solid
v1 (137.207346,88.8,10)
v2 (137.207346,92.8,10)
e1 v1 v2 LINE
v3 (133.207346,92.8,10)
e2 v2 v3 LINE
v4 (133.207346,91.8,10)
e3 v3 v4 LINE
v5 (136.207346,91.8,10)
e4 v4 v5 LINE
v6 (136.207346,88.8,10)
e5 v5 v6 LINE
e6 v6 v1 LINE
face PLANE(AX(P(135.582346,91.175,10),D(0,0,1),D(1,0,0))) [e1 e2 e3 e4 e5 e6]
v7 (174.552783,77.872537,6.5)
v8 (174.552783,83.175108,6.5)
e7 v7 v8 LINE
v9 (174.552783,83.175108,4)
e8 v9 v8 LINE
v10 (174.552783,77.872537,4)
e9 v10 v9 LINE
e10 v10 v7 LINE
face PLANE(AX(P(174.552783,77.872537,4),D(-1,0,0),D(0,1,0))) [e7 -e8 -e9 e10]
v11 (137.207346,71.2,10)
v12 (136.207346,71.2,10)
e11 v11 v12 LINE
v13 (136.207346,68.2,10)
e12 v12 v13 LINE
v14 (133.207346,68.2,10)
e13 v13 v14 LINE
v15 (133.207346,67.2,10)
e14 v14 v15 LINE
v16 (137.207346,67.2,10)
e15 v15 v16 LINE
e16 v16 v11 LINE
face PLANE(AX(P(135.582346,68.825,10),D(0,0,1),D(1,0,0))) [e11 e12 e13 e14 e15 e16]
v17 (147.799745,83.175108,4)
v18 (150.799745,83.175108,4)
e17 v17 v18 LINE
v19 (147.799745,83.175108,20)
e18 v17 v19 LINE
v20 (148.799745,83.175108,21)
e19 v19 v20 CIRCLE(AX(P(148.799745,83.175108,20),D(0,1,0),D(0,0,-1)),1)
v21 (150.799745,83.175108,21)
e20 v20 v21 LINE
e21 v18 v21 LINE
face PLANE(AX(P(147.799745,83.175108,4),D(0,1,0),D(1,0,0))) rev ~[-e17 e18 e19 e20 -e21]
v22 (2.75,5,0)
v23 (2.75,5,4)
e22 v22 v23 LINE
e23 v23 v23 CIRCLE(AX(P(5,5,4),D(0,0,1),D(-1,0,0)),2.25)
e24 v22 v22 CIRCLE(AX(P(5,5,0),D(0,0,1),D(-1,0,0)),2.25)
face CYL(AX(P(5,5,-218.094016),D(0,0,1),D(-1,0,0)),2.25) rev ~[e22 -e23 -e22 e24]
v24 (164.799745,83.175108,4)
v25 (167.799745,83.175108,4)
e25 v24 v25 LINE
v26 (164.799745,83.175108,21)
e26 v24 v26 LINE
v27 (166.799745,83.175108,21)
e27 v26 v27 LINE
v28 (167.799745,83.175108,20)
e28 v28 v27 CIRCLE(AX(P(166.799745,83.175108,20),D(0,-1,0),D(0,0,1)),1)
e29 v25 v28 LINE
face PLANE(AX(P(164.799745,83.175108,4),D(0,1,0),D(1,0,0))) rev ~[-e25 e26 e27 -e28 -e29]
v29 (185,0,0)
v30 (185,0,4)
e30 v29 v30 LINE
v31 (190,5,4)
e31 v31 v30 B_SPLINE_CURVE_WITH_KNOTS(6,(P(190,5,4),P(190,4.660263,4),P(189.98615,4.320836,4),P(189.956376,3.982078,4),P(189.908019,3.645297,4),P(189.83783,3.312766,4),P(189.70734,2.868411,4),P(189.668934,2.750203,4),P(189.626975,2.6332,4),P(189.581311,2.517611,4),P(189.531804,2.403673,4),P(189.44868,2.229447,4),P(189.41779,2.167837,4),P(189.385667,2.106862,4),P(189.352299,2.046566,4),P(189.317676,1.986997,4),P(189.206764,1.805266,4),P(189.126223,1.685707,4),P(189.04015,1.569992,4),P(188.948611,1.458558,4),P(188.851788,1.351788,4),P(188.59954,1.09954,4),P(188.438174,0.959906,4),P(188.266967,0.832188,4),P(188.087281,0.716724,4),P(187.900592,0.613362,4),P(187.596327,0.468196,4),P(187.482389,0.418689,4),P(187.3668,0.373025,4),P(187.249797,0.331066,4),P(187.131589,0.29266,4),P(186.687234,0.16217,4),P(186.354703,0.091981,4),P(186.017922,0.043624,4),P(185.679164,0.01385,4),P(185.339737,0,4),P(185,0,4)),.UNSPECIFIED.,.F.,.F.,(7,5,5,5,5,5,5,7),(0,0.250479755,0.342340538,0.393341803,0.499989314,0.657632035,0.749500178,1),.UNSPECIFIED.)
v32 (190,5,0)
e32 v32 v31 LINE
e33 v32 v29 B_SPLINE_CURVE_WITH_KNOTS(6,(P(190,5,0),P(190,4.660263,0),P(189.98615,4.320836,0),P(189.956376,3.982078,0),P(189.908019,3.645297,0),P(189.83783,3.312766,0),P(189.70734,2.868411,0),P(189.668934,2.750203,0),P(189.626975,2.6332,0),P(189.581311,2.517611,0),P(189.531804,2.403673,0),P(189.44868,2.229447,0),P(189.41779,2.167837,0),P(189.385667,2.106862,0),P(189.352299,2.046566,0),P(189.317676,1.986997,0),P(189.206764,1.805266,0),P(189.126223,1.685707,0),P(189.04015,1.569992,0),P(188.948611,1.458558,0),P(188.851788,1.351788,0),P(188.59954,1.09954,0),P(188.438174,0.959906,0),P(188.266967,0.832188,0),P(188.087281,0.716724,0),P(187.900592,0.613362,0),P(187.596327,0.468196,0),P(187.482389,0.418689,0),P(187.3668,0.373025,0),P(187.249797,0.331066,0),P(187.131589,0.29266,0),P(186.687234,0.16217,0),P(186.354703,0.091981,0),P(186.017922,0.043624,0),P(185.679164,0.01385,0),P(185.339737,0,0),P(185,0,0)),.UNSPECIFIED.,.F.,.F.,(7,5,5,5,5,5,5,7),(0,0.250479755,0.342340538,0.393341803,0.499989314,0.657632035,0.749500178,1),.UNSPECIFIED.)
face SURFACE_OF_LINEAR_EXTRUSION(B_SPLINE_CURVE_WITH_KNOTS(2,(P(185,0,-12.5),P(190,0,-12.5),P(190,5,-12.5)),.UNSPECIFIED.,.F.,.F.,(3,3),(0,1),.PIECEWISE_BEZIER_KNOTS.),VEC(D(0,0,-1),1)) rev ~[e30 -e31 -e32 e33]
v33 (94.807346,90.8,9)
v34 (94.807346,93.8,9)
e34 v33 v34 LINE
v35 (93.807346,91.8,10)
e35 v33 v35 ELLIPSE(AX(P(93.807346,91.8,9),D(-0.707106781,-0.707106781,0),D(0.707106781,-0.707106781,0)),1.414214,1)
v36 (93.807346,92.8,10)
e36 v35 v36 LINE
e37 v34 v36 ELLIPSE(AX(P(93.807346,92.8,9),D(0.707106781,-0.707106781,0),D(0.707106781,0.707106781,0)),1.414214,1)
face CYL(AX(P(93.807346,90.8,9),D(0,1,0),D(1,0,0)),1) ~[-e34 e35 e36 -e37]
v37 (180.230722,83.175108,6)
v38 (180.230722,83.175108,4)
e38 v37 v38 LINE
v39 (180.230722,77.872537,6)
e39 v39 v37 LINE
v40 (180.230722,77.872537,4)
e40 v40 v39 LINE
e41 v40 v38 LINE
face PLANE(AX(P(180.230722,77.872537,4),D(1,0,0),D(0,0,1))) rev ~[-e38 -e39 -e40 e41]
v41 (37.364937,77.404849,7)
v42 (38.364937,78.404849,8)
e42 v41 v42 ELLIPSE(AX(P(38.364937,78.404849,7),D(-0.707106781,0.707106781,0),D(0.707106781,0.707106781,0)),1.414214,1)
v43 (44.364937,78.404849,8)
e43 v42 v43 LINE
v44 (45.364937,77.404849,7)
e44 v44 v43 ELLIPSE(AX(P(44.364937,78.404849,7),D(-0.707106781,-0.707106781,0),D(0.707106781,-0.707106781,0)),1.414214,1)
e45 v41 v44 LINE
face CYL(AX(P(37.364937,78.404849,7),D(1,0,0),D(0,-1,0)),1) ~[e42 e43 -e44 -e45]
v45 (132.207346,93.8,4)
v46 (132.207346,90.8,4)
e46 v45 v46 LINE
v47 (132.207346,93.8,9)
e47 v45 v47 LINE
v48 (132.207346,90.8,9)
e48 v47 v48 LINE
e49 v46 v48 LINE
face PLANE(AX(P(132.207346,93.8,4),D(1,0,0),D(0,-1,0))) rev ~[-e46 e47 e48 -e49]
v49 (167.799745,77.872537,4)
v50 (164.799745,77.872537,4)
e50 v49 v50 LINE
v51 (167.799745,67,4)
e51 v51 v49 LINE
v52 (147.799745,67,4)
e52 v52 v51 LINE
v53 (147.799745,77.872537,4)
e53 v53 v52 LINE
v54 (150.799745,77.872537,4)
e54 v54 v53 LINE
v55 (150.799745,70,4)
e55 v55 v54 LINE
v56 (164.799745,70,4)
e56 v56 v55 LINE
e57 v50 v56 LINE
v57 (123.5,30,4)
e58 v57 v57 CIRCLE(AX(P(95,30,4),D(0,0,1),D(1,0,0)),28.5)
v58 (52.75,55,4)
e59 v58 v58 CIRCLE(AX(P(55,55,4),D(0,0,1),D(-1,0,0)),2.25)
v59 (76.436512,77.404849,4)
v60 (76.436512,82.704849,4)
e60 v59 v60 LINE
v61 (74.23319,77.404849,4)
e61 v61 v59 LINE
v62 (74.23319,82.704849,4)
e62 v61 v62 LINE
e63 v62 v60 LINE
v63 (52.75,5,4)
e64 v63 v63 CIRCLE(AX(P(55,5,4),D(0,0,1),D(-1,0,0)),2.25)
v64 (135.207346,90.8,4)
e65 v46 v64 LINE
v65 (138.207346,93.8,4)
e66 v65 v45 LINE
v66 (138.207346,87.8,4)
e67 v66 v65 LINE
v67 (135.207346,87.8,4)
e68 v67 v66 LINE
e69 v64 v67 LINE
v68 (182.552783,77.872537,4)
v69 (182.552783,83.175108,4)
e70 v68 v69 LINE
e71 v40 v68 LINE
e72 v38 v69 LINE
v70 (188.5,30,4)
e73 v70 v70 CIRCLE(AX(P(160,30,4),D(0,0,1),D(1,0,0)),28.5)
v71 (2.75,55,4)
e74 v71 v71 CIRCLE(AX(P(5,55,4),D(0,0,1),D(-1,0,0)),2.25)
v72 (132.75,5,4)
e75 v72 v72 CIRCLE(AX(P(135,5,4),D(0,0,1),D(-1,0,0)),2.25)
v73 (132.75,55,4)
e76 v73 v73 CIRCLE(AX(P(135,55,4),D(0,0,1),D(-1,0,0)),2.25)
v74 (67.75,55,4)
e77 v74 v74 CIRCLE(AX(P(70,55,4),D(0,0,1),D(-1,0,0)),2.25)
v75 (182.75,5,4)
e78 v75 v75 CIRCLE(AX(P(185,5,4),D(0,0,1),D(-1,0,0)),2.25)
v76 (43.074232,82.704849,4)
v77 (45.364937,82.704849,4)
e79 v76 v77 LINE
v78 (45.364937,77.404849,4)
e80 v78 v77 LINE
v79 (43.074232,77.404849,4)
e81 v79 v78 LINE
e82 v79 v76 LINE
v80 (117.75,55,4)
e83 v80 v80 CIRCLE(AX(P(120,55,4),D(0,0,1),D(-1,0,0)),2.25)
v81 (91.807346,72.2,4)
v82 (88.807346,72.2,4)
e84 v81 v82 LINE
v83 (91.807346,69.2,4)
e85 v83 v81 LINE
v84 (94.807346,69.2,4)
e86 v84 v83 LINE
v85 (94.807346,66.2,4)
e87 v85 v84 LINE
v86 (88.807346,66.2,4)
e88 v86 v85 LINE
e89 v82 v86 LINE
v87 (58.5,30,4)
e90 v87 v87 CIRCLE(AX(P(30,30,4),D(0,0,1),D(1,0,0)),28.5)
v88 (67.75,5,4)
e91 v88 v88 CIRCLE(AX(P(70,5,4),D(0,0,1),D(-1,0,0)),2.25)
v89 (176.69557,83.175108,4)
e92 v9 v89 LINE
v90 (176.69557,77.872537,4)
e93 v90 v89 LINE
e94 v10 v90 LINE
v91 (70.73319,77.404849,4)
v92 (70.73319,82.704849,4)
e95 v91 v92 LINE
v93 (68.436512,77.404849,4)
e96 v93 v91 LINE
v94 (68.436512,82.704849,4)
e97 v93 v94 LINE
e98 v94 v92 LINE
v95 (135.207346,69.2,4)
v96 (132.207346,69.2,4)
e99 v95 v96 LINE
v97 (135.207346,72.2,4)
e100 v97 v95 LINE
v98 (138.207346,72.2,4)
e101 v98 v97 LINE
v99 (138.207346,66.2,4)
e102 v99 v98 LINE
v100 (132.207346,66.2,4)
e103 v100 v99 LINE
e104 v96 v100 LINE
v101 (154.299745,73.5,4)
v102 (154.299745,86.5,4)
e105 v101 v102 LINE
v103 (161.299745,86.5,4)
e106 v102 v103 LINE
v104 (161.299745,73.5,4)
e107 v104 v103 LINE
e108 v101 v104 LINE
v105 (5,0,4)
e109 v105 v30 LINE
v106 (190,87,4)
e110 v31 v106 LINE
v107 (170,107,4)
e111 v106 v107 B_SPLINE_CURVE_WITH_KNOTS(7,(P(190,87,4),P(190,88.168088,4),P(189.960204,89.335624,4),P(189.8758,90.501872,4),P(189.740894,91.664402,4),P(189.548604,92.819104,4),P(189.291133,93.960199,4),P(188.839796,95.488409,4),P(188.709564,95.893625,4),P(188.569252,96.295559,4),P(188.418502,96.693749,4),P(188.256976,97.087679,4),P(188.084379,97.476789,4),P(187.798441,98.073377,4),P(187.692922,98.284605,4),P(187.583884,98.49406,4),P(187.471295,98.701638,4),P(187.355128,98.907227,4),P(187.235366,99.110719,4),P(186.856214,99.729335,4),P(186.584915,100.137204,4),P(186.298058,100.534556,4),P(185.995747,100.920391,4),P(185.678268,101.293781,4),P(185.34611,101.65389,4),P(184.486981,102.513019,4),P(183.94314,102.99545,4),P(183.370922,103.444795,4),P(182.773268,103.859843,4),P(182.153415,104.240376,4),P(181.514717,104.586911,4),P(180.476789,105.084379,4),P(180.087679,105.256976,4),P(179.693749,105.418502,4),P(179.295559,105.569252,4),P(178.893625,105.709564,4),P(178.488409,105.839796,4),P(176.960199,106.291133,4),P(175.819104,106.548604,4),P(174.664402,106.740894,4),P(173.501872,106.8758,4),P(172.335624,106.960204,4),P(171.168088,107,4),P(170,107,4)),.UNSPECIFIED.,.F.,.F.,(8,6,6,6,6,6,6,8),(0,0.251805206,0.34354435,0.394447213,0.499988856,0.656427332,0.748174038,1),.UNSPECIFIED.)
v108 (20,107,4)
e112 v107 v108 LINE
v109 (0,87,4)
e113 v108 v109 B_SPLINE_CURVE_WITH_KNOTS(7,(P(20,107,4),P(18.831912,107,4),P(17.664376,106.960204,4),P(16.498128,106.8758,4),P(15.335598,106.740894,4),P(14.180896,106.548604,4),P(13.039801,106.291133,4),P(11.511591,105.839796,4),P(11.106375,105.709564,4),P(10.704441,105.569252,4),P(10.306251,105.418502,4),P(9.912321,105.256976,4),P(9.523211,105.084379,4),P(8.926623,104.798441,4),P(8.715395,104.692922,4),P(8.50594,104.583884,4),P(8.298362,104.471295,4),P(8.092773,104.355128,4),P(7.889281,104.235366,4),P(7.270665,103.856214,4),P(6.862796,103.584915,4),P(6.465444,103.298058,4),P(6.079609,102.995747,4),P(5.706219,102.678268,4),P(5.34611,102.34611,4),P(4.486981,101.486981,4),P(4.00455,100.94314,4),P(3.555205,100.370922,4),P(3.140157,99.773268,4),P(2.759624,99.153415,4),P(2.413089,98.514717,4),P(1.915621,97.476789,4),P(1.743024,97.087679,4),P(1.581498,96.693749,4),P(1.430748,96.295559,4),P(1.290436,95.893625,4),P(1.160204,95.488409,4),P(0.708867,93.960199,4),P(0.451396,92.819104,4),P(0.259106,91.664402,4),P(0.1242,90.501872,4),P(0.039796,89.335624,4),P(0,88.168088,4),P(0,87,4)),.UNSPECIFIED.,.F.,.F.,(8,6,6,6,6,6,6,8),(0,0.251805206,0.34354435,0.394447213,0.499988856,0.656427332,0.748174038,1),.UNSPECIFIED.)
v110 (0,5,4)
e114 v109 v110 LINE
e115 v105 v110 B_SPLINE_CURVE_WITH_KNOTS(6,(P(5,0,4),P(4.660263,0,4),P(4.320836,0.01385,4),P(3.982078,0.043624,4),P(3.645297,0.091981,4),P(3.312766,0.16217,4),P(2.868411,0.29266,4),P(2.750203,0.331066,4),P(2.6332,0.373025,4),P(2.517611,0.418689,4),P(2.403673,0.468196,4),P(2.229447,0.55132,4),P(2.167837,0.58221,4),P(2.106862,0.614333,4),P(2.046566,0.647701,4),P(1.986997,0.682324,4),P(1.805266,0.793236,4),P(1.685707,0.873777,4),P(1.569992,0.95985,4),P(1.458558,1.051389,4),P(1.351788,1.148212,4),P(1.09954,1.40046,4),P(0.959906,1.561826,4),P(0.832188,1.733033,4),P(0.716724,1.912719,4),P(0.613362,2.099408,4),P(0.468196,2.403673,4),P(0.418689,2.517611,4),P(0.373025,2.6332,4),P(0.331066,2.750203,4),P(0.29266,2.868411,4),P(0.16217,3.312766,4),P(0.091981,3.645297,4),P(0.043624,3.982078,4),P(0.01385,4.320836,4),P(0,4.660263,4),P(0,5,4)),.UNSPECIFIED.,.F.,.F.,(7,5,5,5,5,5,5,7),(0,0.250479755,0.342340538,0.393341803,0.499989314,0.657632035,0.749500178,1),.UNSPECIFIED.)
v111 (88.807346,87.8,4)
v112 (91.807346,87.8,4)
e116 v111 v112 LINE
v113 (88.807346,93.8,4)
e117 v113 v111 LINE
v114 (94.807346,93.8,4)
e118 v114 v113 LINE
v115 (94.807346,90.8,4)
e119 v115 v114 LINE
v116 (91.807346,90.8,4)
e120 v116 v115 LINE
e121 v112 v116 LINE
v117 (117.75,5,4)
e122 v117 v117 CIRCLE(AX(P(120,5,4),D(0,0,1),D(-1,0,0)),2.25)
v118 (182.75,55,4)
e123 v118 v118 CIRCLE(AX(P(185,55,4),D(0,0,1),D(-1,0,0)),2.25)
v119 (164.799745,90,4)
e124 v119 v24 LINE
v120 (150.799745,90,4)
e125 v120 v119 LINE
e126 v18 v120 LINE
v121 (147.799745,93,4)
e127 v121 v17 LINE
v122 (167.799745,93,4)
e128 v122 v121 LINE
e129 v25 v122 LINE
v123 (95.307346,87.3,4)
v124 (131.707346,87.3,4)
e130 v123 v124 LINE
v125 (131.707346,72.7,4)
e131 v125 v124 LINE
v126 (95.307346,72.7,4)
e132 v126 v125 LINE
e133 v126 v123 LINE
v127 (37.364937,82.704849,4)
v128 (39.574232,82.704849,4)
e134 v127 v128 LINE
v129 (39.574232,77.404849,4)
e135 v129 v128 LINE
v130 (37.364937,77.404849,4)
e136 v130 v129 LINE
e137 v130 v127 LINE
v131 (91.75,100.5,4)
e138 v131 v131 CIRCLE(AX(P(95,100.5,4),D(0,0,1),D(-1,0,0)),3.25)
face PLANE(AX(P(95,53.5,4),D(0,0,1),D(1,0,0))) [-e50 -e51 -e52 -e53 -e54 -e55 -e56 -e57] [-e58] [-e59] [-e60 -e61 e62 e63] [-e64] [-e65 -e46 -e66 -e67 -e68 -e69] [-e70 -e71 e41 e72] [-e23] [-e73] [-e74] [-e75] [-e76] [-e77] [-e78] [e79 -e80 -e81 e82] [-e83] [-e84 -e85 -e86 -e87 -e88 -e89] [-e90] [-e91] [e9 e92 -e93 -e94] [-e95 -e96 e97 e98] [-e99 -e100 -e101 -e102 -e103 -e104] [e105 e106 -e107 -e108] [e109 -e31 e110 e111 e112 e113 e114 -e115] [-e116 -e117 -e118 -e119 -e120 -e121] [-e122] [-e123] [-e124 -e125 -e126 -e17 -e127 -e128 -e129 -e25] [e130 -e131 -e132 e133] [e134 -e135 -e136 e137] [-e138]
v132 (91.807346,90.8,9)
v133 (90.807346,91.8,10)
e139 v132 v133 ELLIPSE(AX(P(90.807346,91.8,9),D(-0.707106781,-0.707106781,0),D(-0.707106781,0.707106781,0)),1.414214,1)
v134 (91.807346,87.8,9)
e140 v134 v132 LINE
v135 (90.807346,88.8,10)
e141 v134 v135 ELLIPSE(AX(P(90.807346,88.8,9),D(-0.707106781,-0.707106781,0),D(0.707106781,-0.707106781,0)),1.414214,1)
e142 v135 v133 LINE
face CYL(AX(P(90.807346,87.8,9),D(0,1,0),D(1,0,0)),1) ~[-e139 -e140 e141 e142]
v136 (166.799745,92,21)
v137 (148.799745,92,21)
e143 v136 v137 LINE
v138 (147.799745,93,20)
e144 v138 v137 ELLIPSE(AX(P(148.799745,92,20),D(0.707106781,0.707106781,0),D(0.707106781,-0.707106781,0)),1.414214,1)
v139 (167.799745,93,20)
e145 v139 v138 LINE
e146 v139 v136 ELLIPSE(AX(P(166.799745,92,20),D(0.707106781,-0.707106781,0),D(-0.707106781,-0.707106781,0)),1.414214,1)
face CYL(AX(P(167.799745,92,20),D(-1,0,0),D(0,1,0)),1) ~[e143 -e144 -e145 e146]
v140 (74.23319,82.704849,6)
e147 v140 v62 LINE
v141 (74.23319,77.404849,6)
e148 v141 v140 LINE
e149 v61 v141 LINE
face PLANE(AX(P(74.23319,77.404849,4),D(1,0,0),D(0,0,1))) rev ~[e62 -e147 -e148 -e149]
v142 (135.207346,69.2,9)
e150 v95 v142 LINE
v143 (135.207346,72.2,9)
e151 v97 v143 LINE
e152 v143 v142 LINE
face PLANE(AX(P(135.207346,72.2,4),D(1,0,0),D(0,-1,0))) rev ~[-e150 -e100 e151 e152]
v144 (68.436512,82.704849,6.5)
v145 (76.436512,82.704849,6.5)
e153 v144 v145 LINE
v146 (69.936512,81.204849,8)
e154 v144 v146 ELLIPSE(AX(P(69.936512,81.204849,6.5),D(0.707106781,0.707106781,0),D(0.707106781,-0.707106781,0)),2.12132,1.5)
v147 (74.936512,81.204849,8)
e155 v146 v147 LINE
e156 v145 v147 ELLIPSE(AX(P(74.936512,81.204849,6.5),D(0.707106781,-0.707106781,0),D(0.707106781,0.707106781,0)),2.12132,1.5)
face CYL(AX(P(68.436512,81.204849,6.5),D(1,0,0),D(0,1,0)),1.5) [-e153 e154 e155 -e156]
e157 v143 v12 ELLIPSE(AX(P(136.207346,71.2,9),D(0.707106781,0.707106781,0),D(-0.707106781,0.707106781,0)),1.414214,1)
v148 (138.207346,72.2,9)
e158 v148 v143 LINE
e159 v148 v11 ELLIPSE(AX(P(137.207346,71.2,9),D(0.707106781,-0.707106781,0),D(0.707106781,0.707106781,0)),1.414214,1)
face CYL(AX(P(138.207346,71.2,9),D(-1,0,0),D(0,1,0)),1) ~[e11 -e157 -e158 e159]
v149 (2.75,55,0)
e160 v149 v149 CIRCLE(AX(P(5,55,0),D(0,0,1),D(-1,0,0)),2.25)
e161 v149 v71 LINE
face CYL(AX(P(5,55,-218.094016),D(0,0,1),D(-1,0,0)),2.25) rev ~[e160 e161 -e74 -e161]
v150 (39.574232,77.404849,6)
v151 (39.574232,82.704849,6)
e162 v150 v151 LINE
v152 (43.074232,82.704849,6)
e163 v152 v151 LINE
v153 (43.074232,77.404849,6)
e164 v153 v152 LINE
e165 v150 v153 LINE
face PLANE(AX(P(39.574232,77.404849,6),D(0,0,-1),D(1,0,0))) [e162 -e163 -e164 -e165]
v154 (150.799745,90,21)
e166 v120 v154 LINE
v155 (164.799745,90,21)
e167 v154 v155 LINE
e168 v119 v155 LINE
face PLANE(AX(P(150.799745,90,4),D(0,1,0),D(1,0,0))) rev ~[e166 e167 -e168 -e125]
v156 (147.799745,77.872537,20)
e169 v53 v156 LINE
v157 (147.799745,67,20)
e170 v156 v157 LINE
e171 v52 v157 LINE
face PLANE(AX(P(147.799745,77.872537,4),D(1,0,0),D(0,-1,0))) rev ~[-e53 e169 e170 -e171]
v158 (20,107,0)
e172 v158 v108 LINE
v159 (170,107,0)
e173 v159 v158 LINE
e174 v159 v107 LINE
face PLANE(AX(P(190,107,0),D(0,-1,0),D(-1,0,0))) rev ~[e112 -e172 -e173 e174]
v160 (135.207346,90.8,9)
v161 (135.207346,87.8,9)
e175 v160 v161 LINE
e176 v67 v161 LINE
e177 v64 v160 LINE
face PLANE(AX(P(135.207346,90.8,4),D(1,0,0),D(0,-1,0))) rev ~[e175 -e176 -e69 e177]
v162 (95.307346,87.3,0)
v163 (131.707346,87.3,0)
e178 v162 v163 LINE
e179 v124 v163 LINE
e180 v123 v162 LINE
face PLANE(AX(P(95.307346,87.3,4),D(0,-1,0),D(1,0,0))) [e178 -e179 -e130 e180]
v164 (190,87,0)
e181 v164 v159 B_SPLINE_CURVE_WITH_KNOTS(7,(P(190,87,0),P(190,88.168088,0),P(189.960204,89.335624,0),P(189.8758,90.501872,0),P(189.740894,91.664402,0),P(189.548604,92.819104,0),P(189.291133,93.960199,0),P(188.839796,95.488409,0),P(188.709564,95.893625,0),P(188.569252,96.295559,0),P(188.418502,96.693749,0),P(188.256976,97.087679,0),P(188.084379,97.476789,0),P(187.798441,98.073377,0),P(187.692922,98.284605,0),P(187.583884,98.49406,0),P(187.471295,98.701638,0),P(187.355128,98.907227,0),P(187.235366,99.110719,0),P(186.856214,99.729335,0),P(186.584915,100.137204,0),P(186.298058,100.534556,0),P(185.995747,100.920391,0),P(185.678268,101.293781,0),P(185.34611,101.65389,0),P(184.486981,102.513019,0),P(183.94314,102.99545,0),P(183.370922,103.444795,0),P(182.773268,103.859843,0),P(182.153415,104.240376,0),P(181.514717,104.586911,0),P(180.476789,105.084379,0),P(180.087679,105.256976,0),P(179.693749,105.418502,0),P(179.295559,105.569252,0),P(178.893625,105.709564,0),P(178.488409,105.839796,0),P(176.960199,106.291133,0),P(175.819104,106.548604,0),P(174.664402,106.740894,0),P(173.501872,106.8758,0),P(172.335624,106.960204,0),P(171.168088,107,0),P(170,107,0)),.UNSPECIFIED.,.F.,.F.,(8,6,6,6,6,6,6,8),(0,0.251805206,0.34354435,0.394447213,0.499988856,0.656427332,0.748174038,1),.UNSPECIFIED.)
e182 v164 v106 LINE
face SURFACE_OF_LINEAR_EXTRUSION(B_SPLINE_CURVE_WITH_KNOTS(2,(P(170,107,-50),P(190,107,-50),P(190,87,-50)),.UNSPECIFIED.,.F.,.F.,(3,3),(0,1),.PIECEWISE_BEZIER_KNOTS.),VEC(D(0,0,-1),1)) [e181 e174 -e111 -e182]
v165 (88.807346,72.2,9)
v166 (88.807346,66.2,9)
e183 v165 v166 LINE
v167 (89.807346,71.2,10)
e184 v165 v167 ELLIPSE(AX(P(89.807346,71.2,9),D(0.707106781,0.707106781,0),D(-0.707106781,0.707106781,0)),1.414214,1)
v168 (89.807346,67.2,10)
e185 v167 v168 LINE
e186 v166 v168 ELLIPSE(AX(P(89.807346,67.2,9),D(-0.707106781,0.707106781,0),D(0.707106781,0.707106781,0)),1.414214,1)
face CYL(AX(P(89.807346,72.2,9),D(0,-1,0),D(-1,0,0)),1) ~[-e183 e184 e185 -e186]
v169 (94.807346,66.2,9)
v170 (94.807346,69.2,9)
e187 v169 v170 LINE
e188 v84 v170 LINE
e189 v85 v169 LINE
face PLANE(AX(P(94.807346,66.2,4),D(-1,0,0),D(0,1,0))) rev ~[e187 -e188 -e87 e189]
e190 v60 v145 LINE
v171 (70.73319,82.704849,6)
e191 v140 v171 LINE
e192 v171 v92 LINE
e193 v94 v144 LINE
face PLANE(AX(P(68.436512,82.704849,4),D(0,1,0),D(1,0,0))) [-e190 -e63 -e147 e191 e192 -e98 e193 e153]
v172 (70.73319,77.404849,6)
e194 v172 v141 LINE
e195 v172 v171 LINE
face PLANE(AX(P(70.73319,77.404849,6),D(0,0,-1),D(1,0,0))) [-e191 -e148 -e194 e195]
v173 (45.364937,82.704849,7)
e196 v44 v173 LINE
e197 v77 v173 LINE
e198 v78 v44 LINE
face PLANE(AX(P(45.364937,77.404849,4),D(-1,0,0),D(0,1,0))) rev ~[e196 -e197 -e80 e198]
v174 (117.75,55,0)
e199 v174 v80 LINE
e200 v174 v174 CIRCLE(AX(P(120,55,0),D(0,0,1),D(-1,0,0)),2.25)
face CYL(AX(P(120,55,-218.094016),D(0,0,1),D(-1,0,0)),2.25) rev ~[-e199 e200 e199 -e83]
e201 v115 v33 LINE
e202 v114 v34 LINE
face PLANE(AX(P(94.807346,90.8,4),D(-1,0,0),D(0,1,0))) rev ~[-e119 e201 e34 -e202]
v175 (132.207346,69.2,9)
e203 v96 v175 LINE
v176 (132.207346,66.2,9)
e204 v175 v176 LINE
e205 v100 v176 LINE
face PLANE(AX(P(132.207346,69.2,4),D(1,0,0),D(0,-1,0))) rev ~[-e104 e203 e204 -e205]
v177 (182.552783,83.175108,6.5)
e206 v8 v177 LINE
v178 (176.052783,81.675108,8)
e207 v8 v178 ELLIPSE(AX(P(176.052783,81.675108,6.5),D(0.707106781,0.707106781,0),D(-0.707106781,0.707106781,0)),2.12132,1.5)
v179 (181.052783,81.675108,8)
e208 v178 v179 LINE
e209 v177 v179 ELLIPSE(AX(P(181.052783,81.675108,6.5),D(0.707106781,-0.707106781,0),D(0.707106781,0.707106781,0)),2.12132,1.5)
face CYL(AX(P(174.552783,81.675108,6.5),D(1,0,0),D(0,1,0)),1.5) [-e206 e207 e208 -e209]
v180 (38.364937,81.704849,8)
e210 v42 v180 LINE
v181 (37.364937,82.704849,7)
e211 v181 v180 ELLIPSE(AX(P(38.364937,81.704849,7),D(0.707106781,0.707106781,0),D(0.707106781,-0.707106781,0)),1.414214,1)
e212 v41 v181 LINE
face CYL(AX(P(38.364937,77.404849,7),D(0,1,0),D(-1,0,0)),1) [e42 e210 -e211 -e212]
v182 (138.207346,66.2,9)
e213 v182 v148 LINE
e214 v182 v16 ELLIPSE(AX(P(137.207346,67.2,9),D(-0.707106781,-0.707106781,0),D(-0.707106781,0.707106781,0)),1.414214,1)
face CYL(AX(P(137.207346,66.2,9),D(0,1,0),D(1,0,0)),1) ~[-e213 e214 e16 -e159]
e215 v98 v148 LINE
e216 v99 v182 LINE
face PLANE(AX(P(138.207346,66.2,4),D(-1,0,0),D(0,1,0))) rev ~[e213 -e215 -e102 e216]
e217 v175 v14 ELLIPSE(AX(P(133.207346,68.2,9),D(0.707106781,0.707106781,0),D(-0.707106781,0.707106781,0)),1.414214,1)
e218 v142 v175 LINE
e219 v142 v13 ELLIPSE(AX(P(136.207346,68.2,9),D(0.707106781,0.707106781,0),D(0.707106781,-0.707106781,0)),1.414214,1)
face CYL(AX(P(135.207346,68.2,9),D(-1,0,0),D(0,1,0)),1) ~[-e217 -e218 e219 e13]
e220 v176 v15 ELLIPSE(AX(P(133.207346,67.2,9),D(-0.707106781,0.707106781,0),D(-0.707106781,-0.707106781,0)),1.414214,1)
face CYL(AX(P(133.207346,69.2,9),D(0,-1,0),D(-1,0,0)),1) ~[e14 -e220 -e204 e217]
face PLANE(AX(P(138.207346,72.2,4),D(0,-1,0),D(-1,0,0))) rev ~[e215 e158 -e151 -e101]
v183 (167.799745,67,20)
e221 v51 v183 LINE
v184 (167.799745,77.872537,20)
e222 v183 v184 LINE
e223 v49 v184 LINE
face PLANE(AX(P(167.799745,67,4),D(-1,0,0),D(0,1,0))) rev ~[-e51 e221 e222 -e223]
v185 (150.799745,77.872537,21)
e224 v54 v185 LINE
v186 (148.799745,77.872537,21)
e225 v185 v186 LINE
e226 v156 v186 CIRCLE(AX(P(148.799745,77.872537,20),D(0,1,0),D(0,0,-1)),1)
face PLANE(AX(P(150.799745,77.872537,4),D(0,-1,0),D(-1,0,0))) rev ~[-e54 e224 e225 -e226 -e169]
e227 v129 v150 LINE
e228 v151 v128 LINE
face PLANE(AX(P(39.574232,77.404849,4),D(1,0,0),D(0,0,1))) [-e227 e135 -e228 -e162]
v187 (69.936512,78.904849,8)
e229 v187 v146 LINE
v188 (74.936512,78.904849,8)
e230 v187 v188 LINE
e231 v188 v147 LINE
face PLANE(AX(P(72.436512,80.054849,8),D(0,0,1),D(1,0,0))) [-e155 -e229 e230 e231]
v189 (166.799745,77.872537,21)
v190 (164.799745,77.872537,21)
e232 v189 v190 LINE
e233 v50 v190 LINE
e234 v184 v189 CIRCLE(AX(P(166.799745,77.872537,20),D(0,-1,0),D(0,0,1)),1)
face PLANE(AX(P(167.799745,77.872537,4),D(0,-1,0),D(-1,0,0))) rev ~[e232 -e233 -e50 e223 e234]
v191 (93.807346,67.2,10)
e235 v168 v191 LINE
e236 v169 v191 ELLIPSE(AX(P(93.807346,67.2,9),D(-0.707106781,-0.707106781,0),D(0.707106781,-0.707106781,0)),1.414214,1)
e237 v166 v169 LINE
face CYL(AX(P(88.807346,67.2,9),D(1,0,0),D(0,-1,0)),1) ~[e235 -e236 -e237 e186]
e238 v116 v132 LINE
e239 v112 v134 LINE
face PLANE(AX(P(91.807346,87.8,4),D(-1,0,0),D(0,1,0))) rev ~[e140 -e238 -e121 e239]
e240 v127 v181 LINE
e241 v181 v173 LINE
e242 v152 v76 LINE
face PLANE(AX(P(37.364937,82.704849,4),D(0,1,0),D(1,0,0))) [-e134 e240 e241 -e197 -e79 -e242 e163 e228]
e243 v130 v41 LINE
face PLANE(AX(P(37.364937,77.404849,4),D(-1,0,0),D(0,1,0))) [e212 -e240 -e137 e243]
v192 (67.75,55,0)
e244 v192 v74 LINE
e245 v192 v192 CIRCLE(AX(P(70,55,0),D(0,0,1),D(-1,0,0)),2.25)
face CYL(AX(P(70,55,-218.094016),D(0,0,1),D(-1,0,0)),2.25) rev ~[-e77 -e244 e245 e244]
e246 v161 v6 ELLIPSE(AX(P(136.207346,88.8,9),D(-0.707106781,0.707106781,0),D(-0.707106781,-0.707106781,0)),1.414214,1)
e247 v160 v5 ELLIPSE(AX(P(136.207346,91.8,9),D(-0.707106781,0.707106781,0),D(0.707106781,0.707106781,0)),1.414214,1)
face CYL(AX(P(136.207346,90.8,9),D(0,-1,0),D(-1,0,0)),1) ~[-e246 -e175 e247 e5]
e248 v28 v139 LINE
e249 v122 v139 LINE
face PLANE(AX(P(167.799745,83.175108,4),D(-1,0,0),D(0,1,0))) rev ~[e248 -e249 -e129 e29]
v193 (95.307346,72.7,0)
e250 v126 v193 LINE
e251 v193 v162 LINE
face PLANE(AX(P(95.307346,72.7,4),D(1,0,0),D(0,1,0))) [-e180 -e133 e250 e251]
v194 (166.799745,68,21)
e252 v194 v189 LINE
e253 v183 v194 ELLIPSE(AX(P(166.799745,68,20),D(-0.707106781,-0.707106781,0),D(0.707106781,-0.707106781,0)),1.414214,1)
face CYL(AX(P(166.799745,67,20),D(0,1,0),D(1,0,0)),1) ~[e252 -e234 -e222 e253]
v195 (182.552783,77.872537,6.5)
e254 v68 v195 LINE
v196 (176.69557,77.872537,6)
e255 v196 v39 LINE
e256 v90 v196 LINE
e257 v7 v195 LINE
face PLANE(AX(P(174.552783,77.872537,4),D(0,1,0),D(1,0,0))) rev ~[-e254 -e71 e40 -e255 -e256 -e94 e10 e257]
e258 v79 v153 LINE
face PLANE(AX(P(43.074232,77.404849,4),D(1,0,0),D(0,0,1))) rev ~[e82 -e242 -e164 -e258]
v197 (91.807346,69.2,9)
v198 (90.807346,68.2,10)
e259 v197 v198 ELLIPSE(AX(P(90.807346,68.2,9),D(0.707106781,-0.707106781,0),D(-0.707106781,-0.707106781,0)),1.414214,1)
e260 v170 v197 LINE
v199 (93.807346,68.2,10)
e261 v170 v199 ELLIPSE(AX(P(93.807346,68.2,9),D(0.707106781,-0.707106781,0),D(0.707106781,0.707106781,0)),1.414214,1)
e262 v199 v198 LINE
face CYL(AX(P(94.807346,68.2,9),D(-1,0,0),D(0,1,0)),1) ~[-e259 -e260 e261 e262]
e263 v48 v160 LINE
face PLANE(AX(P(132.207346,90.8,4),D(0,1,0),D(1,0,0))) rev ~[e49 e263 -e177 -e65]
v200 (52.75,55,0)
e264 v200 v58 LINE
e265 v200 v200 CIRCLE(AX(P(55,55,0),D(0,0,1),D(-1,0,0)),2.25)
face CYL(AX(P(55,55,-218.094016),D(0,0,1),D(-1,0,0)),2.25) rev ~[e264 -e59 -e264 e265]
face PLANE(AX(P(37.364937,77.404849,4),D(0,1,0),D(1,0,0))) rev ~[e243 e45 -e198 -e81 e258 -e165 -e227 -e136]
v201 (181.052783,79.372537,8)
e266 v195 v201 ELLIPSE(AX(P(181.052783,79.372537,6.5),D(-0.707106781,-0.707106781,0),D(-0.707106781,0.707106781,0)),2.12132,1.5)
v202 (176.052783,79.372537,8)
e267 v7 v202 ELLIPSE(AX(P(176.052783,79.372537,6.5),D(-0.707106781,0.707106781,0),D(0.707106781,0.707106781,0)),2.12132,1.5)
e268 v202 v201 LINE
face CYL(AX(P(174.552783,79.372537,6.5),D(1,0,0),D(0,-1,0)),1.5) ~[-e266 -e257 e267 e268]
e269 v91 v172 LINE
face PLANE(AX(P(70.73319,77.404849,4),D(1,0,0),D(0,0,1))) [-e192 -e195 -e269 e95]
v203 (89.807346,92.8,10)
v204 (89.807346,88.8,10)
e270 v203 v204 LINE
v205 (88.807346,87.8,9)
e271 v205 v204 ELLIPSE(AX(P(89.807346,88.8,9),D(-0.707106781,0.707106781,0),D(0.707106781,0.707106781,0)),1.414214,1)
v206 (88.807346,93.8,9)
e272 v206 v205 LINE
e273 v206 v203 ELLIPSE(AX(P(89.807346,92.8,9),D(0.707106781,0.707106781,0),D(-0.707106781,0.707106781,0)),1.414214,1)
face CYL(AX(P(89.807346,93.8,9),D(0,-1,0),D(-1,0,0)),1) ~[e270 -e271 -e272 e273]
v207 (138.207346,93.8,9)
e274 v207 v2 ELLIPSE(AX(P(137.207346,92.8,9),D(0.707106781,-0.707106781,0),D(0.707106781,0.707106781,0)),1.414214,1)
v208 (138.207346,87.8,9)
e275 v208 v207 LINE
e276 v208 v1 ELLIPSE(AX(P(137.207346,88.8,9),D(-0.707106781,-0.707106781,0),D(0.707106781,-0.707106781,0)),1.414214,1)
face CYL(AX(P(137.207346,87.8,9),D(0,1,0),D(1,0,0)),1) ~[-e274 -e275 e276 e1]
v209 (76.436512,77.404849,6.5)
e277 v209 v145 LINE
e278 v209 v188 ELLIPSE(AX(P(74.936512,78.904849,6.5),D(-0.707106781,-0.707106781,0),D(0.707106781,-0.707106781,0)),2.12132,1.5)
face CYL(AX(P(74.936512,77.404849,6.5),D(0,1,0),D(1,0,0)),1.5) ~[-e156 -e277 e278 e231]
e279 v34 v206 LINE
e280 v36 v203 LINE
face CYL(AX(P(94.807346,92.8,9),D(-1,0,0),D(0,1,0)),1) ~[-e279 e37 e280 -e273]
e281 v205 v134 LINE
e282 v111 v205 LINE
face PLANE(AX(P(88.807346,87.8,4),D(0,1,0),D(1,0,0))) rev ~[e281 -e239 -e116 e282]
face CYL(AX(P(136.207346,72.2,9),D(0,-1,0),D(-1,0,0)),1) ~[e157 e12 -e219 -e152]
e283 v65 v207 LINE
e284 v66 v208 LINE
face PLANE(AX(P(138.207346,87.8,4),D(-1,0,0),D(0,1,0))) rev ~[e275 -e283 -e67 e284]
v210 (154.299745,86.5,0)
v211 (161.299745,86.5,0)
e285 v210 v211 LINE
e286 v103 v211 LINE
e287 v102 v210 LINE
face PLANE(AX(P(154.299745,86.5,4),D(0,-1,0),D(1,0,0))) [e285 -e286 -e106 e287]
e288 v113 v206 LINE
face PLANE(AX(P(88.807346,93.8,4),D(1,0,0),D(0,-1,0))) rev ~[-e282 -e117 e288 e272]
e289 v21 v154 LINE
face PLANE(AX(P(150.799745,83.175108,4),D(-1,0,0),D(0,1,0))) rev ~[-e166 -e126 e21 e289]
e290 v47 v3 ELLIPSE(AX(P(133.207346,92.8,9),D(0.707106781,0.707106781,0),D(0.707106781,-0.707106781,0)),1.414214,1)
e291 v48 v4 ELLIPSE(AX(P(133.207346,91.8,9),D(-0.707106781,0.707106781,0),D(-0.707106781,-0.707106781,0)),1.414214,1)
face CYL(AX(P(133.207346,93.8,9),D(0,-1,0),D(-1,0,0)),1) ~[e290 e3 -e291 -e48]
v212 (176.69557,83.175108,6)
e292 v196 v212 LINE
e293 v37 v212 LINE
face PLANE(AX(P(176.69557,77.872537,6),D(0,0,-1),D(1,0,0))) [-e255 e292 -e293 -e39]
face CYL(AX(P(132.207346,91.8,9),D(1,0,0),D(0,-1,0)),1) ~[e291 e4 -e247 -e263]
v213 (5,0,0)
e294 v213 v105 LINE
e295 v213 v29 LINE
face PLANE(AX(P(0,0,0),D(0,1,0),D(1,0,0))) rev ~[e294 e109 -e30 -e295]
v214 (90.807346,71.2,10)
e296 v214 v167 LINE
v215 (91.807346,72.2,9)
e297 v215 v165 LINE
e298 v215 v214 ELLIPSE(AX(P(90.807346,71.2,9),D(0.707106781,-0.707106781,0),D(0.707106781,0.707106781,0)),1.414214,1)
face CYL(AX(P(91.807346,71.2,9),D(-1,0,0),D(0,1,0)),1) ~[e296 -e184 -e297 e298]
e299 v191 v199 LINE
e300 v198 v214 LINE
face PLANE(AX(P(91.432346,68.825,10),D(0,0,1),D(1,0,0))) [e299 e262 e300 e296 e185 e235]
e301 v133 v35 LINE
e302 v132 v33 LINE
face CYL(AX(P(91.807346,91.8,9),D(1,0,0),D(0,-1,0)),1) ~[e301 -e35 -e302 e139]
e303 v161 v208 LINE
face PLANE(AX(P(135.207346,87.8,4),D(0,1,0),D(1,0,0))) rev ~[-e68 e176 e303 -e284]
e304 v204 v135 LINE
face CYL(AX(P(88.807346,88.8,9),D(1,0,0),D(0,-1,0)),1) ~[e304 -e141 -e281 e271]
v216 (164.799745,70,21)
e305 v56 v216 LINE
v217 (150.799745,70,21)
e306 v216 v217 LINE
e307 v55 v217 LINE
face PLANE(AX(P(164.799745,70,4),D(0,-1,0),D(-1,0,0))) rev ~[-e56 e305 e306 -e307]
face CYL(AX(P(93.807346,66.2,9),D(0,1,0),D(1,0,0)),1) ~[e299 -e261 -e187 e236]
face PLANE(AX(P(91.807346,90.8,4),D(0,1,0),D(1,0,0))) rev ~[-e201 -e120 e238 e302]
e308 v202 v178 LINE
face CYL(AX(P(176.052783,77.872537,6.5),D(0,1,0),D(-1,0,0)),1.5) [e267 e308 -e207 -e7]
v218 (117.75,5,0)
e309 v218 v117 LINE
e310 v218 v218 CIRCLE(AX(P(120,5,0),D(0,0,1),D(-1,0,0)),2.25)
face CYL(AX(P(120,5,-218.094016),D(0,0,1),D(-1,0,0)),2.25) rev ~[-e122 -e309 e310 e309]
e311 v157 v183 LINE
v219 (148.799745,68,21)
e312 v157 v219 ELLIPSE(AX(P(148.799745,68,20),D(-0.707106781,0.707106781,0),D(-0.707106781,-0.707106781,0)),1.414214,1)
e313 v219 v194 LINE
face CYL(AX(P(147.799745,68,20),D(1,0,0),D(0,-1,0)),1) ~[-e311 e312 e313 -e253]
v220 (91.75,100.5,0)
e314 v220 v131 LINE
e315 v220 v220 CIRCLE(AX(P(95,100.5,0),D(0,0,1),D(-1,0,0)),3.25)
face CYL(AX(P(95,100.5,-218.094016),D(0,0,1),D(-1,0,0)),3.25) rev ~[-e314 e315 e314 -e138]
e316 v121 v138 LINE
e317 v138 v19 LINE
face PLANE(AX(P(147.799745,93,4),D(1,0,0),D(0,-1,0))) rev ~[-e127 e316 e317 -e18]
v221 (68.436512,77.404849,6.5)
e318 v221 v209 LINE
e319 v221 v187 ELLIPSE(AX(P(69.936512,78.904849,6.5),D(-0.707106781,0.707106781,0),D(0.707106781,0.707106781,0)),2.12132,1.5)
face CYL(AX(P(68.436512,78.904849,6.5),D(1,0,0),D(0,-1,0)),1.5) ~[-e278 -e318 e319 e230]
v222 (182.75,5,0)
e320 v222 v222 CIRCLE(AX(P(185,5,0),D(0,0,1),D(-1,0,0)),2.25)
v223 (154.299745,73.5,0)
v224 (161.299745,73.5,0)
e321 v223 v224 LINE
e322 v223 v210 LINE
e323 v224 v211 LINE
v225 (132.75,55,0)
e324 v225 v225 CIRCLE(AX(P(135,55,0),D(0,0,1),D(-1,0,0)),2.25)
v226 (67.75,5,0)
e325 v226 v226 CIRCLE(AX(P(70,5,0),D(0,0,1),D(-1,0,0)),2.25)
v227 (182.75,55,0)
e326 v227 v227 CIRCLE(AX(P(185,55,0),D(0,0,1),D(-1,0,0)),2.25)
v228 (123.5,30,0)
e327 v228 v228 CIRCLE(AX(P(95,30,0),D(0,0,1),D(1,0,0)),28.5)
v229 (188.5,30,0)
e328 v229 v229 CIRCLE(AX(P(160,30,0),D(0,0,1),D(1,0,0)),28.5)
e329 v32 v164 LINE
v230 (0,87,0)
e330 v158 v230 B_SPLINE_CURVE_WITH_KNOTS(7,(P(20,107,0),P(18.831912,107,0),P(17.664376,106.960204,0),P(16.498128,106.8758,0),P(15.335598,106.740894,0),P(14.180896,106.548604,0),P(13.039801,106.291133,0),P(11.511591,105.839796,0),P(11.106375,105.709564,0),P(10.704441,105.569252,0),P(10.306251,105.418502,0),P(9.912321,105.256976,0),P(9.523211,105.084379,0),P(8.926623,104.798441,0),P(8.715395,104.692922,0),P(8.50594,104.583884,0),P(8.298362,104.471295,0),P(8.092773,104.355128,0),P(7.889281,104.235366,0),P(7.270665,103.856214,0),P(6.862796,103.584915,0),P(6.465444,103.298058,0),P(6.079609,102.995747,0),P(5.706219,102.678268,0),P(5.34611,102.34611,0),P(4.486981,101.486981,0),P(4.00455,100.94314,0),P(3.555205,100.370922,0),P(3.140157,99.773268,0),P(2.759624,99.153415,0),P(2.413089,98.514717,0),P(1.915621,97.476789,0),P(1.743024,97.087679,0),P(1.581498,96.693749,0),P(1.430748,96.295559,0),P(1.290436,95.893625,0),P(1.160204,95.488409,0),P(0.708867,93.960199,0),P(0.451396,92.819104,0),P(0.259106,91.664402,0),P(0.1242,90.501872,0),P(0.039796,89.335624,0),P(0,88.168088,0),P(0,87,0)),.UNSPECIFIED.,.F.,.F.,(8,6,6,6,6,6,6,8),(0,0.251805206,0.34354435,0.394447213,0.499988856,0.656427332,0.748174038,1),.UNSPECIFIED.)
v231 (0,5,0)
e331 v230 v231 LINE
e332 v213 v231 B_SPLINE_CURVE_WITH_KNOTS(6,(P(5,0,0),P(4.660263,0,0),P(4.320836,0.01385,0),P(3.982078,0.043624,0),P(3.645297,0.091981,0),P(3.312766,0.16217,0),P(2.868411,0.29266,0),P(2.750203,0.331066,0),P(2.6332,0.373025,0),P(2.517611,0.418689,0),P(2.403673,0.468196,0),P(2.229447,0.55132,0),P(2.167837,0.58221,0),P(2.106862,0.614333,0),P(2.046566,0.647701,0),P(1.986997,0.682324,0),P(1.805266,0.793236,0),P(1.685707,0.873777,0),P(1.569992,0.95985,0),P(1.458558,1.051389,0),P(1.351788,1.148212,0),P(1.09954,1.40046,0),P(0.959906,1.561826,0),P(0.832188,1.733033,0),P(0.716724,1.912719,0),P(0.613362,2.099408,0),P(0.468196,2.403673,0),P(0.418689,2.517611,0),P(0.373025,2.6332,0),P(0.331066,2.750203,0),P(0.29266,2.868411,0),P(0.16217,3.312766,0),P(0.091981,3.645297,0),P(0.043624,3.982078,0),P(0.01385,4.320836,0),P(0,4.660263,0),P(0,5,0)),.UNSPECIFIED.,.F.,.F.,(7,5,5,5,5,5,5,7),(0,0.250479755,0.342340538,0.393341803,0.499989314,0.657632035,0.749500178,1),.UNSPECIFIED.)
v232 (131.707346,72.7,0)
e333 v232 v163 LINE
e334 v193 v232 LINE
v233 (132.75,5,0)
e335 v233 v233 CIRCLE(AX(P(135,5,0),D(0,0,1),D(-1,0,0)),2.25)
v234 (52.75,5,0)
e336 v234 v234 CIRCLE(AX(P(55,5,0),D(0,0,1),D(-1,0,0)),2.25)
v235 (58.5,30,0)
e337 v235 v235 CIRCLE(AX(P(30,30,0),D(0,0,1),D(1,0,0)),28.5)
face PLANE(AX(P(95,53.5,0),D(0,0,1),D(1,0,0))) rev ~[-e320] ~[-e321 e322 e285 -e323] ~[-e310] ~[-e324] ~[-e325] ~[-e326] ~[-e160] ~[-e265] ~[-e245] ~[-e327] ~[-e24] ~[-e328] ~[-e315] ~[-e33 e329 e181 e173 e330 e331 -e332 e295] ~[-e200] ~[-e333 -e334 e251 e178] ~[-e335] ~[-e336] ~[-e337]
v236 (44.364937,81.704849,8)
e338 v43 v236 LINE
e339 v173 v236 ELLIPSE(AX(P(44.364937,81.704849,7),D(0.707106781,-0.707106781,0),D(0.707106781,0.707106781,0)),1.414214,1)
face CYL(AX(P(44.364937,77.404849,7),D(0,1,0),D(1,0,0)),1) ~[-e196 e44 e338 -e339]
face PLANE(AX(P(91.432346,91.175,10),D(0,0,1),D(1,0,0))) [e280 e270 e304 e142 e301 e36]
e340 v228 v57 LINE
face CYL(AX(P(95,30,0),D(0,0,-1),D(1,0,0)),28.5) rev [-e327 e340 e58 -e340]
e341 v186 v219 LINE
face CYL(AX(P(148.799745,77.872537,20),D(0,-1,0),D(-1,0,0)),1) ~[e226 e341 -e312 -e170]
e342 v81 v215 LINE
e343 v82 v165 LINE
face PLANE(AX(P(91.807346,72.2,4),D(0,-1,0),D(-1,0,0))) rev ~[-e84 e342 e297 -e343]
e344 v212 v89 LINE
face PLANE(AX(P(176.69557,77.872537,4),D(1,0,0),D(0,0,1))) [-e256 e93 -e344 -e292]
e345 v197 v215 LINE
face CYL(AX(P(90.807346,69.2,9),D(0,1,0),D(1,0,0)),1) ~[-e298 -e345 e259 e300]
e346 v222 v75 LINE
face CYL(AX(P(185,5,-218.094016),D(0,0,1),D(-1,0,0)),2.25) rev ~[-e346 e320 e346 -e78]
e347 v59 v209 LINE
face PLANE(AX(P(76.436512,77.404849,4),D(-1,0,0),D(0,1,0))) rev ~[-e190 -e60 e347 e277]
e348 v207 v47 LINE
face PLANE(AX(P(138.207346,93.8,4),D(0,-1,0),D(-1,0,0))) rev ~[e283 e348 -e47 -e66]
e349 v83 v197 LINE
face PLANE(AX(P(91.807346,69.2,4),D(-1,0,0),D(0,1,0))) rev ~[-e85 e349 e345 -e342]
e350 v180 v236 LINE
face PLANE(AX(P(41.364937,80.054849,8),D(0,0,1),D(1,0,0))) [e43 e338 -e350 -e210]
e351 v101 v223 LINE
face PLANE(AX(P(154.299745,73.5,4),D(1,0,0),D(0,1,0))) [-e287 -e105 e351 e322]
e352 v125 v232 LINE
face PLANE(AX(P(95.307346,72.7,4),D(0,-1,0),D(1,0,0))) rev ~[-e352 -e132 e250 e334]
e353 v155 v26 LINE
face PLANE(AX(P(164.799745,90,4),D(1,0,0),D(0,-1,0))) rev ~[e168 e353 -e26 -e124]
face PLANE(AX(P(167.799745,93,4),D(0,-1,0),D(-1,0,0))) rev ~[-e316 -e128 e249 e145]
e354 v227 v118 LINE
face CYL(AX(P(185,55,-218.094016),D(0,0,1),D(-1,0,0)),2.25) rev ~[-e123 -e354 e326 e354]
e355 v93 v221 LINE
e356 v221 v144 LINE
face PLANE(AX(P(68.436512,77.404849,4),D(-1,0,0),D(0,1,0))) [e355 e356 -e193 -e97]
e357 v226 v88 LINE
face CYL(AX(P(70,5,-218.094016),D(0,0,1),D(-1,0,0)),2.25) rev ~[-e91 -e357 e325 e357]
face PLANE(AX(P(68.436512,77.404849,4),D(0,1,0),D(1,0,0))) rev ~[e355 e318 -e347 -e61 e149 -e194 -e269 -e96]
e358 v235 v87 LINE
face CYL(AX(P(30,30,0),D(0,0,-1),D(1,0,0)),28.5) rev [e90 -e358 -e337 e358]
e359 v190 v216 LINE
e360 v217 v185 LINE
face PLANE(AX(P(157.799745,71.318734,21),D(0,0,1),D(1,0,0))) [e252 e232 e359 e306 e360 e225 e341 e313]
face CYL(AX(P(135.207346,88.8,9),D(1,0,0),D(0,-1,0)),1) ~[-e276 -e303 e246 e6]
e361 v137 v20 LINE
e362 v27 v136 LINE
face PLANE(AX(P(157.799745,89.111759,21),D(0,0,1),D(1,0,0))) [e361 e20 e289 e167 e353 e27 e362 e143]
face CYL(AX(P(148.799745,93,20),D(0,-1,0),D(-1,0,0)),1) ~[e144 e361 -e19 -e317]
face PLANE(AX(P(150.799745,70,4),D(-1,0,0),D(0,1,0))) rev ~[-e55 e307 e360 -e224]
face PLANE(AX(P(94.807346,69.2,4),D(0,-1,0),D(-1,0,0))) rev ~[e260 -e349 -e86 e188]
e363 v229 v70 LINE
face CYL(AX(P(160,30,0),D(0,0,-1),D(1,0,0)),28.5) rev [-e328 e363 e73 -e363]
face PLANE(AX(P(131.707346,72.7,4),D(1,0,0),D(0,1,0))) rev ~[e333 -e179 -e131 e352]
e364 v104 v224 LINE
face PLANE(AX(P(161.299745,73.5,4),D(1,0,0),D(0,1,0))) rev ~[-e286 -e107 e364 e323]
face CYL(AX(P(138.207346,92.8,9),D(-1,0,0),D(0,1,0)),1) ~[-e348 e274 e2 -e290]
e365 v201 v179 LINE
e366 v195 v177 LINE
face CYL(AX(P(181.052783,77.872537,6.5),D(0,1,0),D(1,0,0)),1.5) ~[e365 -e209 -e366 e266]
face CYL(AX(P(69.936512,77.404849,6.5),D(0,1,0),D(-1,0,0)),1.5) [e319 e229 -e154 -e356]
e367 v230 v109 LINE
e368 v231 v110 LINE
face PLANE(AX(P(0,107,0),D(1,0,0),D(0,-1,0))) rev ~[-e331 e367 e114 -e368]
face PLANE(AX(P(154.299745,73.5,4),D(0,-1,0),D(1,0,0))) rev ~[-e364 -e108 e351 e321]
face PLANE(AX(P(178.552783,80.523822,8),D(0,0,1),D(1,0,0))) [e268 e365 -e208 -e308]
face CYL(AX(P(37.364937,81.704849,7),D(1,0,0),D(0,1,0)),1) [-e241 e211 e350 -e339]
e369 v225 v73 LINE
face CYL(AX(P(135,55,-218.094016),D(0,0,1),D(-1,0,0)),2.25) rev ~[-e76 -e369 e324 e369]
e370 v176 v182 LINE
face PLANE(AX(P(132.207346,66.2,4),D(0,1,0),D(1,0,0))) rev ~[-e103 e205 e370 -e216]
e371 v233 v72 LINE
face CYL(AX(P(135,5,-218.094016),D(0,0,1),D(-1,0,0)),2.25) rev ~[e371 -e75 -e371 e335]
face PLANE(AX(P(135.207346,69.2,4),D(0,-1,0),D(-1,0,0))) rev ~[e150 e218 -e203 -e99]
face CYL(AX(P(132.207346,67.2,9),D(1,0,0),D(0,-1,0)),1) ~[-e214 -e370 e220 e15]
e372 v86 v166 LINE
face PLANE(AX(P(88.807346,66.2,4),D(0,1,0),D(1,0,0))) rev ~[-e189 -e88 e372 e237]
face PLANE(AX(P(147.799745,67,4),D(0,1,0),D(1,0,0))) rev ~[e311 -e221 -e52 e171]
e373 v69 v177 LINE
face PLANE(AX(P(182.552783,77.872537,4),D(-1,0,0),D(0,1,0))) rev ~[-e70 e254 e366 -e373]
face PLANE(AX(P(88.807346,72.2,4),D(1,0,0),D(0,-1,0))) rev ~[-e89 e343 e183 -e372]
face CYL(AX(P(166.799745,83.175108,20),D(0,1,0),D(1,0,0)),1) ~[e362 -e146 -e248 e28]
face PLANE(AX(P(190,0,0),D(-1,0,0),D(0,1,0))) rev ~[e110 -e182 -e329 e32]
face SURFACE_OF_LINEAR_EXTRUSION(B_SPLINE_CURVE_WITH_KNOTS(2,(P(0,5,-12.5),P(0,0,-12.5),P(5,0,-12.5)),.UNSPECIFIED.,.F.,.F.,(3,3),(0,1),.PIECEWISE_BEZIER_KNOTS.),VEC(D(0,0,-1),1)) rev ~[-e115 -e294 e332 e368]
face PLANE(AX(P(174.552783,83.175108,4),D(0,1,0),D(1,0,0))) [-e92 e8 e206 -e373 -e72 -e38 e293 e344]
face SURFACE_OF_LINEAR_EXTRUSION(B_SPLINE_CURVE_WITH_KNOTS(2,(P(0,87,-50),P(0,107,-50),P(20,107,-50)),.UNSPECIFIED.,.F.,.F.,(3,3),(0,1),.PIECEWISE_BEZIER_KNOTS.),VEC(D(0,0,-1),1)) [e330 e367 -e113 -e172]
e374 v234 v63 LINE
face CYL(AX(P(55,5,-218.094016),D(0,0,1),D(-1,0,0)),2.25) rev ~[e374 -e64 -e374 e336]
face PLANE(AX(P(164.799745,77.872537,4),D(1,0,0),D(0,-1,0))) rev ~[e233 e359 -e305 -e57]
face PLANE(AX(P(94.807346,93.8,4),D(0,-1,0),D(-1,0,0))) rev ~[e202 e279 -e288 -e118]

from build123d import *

# Parameters (mm, degrees)
F0_R         = 28.5
F1_DEPTH     = 4
F2_D         = 6.5
F3_D         = 4.5
F5_DEPTH     = 17
F6_DEPTH     = 6
F4_W         = 36.4
F4_H         = 14.6
F7_DEPTH     = 25
F4_W_2       = 7
F4_H_2       = 13
F8_DEPTH     = 25
F9_T1_DEPTH  = 104
F10_T1_DEPTH = 29
F4_W_3       = 8
F4_H_3       = 5.3025707603
F4_H_4       = 5.3
F11_DEPTH    = 4
F12_W        = 3.5351514816
F12_H        = 2
F13_DEPTH    = 25
F14_R        = 1.5
F15_R        = 1
F16_W        = 3.5
F16_H        = 2
F17_DEPTH    = 25
F18_R        = 1.5
F19_W        = 3.5
F19_H        = 2
F20_DEPTH    = 25
F21_R        = 1
F22_R        = 1


# Not quite as in the source:
# - a fillet or chamfer that OpenCascade refuses, or shapes differently, is made with other operations: its cross-section is extruded or revolved along the edge and cut away or added


with BuildPart() as f1:
    # F0 (on Top) → F1 (new body)
    with BuildSketch(Plane.XY):
        Polygon((0, 60), (0, 0), (60, 0), (65, 0), (125, 0), (130, 0), (190, 0), (190, 60), (190, 107), (0, 107), align=None)
        with Locations((30, 30)):
            Circle(F0_R, mode=Mode.SUBTRACT)
        with Locations((95, 30)):
            Circle(F0_R, mode=Mode.SUBTRACT)
        with Locations((160, 30)):
            Circle(F0_R, mode=Mode.SUBTRACT)
    extrude(amount=F1_DEPTH)

    # F2 (through all)
    with Locations(Plane(origin=(0, 0, 0), x_dir=(1, 0, 0), z_dir=(0, 0, -1))):
        with Locations((95, -100.5)):
            Hole(F2_D / 2)

    # F3 (through all)
    with Locations(Plane(origin=(0, 0, 0), x_dir=(1, 0, 0), z_dir=(0, 0, -1))):
        with Locations((5, -55), (55, -55), (5, -5), (55, -5), (70, -55), (70, -5), (120, -5), (120, -55), (135, -55), (135, -5), (185, -5), (185, -55)):
            Hole(F3_D / 2)

    # F4 (on face) → F5 (join)
    with BuildSketch(Plane.XY.offset(4)):
        Polygon((150.7997452021, 83.1751078367), (150.7997452021, 90), (164.7997452021, 90), (164.7997452021, 83.1751078367), (167.7997452021, 83.1751078367), (167.7997452021, 93), (147.7997452021, 93), (147.7997452021, 83.1751078367), align=None)
        Polygon((150.7997452021, 70), (150.7997452021, 77.8725370765), (147.7997452021, 77.8725370765), (147.7997452021, 67), (167.7997452021, 67), (167.7997452021, 77.8725370765), (164.7997452021, 77.8725370765), (164.7997452021, 70), align=None)
    extrude(amount=F5_DEPTH)

    # F4 (on face) → F6 (join)
    with BuildSketch(Plane.XY.offset(4)):
        Polygon((132.2073462009, 93.8), (132.2073462009, 90.8), (135.2073462009, 90.8), (135.2073462009, 87.8), (138.2073462009, 87.8), (138.2073462009, 93.8), align=None)
        Polygon((138.2073462009, 66.2), (138.2073462009, 72.2), (135.2073462009, 72.2), (135.2073462009, 69.2), (132.2073462009, 69.2), (132.2073462009, 66.2), align=None)
        Polygon((88.8073462009, 66.2), (94.8073462009, 66.2), (94.8073462009, 69.2), (91.8073462009, 69.2), (91.8073462009, 72.2), (88.8073462009, 72.2), align=None)
        Polygon((88.8073462009, 87.8), (91.8073462009, 87.8), (91.8073462009, 90.8), (94.8073462009, 90.8), (94.8073462009, 93.8), (88.8073462009, 93.8), align=None)
    extrude(amount=F6_DEPTH)

    # F4 (on face) → F7 (cut)
    with BuildSketch(Plane.XY.offset(4)):
        with Locations((113.5073462009, 80)):
            Rectangle(F4_W, F4_H)
    extrude(amount=-F7_DEPTH, mode=Mode.SUBTRACT)

    # F4 (on face) → F8 (cut)
    with BuildSketch(Plane.XY.offset(4)):
        with Locations((157.7997452021, 80)):
            Rectangle(F4_W_2, F4_H_2)
    extrude(amount=-F8_DEPTH, mode=Mode.SUBTRACT)

    # F9: fillet of radius 20 on 2 edges, made by hand

    # F9_s2 → F9_t1 (cut)
    with BuildSketch(Plane.XY.offset(-50)):
        with BuildLine():
            add(Edge.make_bspline(
                [(0, 87), (0, 107), (20, 107)],
                knots=[0, 0, 0, 1, 1, 1], degree=2, weights=[1, 1, 1]))
            Line((20, 107), (0, 107))
            Line((0, 107), (0, 87))
        make_face()
        with BuildLine():
            add(Edge.make_bspline(
                [(170, 107), (190, 107), (190, 87)],
                knots=[0, 0, 0, 1, 1, 1], degree=2, weights=[1, 1, 1]))
            Line((190, 87), (190, 107))
            Line((190, 107), (170, 107))
        make_face()
    extrude(amount=F9_T1_DEPTH, mode=Mode.SUBTRACT)

    # F10: fillet of radius 5 on 2 edges, made by hand

    # F10_s2 → F10_t1 (cut)
    with BuildSketch(Plane.XY.offset(-12.5)):
        with BuildLine():
            add(Edge.make_bspline(
                [(0, 5), (0, 0), (5, 0)],
                knots=[0, 0, 0, 1, 1, 1], degree=2, weights=[1, 1, 1]))
            Line((5, 0), (0, 0))
            Line((0, 0), (0, 5))
        make_face()
        with BuildLine():
            add(Edge.make_bspline(
                [(185, 0), (190, 0), (190, 5)],
                knots=[0, 0, 0, 1, 1, 1], degree=2, weights=[1, 1, 1]))
            Line((190, 5), (190, 0))
            Line((190, 0), (185, 0))
        make_face()
    extrude(amount=F10_T1_DEPTH, mode=Mode.SUBTRACT)

    # F4 (on face) → F11 (join)
    with BuildSketch(Plane.XY.offset(4)):
        with Locations((178.55278337, 80.5238224566)):
            Rectangle(F4_W_3, F4_H_3)
        with Locations((72.4365121722, 80.0548492312)):
            Rectangle(F4_W_3, F4_H_4)
        with Locations((41.3649373651, 80.0548492312)):
            Rectangle(F4_W_3, F4_H_4)
    extrude(amount=F11_DEPTH)

    # F12 (on face) → F13 (cut)
    with BuildSketch(Plane.XZ.offset(-77.8725370765)):
        with Locations((178.4631460905, 5)):
            Rectangle(F12_W, F12_H)
    extrude(amount=-F13_DEPTH, mode=Mode.SUBTRACT)

    # F14
    f14_edges = [f1.edges().sort_by_distance(p)[0] for p in [
        (174.552783, 80.523822, 8),
        (182.552783, 80.523822, 8),
        (178.552783, 83.175108, 8),
        (178.552783, 77.872537, 8),
    ]]
    fillet(f14_edges, radius=F14_R)

    # F15
    f15_edges = [f1.edges().sort_by_distance(p)[0] for p in [
        (147.799745, 72.436269, 21),
        (157.799745, 67, 21),
        (167.799745, 72.436269, 21),
        (147.799745, 88.087554, 21),
        (157.799745, 93, 21),
        (167.799745, 88.087554, 21),
    ]]
    fillet(f15_edges, radius=F15_R)

    # F16 (on face) → F17 (cut)
    with BuildSketch(Plane.XZ.offset(-77.4048492312)):
        with Locations((72.4831895828, 5)):
            Rectangle(F16_W, F16_H)
    extrude(amount=-F17_DEPTH, mode=Mode.SUBTRACT)

    # F18
    f18_edges = [f1.edges().sort_by_distance(p)[0] for p in [
        (72.436512, 82.704849, 8),
        (68.436512, 80.054849, 8),
        (72.436512, 77.404849, 8),
        (76.436512, 80.054849, 8),
    ]]
    fillet(f18_edges, radius=F18_R)

    # F19 (on face) → F20 (cut)
    with BuildSketch(Plane.XZ.offset(-77.4048492312)):
        with Locations((41.3242319524, 5)):
            Rectangle(F19_W, F19_H)
    extrude(amount=-F20_DEPTH, mode=Mode.SUBTRACT)

    # F21
    f21_edges = [f1.edges().sort_by_distance(p)[0] for p in [
        (41.364937, 77.404849, 8),
        (45.364937, 80.054849, 8),
        (41.364937, 82.704849, 8),
        (37.364937, 80.054849, 8),
    ]]
    fillet(f21_edges, radius=F21_R)

    # F22
    f22_edges = [f1.edges().sort_by_distance(p)[0] for p in [
        (90.307346, 87.8, 10),
        (91.807346, 89.3, 10),
        (93.307346, 90.8, 10),
        (94.807346, 92.3, 10),
        (91.807346, 93.8, 10),
        (88.807346, 90.8, 10),
        (132.207346, 92.3, 10),
        (133.707346, 90.8, 10),
        (135.207346, 89.3, 10),
        (136.707346, 87.8, 10),
        (138.207346, 90.8, 10),
        (135.207346, 93.8, 10),
        (138.207346, 69.2, 10),
        (136.707346, 72.2, 10),
        (135.207346, 70.7, 10),
        (133.707346, 69.2, 10),
        (132.207346, 67.7, 10),
        (135.207346, 66.2, 10),
        (91.807346, 66.2, 10),
        (94.807346, 67.7, 10),
        (93.307346, 69.2, 10),
        (91.807346, 70.7, 10),
        (90.307346, 72.2, 10),
        (88.807346, 69.2, 10),
    ]]
    fillet(f22_edges, radius=F22_R)


solid = f1.part
